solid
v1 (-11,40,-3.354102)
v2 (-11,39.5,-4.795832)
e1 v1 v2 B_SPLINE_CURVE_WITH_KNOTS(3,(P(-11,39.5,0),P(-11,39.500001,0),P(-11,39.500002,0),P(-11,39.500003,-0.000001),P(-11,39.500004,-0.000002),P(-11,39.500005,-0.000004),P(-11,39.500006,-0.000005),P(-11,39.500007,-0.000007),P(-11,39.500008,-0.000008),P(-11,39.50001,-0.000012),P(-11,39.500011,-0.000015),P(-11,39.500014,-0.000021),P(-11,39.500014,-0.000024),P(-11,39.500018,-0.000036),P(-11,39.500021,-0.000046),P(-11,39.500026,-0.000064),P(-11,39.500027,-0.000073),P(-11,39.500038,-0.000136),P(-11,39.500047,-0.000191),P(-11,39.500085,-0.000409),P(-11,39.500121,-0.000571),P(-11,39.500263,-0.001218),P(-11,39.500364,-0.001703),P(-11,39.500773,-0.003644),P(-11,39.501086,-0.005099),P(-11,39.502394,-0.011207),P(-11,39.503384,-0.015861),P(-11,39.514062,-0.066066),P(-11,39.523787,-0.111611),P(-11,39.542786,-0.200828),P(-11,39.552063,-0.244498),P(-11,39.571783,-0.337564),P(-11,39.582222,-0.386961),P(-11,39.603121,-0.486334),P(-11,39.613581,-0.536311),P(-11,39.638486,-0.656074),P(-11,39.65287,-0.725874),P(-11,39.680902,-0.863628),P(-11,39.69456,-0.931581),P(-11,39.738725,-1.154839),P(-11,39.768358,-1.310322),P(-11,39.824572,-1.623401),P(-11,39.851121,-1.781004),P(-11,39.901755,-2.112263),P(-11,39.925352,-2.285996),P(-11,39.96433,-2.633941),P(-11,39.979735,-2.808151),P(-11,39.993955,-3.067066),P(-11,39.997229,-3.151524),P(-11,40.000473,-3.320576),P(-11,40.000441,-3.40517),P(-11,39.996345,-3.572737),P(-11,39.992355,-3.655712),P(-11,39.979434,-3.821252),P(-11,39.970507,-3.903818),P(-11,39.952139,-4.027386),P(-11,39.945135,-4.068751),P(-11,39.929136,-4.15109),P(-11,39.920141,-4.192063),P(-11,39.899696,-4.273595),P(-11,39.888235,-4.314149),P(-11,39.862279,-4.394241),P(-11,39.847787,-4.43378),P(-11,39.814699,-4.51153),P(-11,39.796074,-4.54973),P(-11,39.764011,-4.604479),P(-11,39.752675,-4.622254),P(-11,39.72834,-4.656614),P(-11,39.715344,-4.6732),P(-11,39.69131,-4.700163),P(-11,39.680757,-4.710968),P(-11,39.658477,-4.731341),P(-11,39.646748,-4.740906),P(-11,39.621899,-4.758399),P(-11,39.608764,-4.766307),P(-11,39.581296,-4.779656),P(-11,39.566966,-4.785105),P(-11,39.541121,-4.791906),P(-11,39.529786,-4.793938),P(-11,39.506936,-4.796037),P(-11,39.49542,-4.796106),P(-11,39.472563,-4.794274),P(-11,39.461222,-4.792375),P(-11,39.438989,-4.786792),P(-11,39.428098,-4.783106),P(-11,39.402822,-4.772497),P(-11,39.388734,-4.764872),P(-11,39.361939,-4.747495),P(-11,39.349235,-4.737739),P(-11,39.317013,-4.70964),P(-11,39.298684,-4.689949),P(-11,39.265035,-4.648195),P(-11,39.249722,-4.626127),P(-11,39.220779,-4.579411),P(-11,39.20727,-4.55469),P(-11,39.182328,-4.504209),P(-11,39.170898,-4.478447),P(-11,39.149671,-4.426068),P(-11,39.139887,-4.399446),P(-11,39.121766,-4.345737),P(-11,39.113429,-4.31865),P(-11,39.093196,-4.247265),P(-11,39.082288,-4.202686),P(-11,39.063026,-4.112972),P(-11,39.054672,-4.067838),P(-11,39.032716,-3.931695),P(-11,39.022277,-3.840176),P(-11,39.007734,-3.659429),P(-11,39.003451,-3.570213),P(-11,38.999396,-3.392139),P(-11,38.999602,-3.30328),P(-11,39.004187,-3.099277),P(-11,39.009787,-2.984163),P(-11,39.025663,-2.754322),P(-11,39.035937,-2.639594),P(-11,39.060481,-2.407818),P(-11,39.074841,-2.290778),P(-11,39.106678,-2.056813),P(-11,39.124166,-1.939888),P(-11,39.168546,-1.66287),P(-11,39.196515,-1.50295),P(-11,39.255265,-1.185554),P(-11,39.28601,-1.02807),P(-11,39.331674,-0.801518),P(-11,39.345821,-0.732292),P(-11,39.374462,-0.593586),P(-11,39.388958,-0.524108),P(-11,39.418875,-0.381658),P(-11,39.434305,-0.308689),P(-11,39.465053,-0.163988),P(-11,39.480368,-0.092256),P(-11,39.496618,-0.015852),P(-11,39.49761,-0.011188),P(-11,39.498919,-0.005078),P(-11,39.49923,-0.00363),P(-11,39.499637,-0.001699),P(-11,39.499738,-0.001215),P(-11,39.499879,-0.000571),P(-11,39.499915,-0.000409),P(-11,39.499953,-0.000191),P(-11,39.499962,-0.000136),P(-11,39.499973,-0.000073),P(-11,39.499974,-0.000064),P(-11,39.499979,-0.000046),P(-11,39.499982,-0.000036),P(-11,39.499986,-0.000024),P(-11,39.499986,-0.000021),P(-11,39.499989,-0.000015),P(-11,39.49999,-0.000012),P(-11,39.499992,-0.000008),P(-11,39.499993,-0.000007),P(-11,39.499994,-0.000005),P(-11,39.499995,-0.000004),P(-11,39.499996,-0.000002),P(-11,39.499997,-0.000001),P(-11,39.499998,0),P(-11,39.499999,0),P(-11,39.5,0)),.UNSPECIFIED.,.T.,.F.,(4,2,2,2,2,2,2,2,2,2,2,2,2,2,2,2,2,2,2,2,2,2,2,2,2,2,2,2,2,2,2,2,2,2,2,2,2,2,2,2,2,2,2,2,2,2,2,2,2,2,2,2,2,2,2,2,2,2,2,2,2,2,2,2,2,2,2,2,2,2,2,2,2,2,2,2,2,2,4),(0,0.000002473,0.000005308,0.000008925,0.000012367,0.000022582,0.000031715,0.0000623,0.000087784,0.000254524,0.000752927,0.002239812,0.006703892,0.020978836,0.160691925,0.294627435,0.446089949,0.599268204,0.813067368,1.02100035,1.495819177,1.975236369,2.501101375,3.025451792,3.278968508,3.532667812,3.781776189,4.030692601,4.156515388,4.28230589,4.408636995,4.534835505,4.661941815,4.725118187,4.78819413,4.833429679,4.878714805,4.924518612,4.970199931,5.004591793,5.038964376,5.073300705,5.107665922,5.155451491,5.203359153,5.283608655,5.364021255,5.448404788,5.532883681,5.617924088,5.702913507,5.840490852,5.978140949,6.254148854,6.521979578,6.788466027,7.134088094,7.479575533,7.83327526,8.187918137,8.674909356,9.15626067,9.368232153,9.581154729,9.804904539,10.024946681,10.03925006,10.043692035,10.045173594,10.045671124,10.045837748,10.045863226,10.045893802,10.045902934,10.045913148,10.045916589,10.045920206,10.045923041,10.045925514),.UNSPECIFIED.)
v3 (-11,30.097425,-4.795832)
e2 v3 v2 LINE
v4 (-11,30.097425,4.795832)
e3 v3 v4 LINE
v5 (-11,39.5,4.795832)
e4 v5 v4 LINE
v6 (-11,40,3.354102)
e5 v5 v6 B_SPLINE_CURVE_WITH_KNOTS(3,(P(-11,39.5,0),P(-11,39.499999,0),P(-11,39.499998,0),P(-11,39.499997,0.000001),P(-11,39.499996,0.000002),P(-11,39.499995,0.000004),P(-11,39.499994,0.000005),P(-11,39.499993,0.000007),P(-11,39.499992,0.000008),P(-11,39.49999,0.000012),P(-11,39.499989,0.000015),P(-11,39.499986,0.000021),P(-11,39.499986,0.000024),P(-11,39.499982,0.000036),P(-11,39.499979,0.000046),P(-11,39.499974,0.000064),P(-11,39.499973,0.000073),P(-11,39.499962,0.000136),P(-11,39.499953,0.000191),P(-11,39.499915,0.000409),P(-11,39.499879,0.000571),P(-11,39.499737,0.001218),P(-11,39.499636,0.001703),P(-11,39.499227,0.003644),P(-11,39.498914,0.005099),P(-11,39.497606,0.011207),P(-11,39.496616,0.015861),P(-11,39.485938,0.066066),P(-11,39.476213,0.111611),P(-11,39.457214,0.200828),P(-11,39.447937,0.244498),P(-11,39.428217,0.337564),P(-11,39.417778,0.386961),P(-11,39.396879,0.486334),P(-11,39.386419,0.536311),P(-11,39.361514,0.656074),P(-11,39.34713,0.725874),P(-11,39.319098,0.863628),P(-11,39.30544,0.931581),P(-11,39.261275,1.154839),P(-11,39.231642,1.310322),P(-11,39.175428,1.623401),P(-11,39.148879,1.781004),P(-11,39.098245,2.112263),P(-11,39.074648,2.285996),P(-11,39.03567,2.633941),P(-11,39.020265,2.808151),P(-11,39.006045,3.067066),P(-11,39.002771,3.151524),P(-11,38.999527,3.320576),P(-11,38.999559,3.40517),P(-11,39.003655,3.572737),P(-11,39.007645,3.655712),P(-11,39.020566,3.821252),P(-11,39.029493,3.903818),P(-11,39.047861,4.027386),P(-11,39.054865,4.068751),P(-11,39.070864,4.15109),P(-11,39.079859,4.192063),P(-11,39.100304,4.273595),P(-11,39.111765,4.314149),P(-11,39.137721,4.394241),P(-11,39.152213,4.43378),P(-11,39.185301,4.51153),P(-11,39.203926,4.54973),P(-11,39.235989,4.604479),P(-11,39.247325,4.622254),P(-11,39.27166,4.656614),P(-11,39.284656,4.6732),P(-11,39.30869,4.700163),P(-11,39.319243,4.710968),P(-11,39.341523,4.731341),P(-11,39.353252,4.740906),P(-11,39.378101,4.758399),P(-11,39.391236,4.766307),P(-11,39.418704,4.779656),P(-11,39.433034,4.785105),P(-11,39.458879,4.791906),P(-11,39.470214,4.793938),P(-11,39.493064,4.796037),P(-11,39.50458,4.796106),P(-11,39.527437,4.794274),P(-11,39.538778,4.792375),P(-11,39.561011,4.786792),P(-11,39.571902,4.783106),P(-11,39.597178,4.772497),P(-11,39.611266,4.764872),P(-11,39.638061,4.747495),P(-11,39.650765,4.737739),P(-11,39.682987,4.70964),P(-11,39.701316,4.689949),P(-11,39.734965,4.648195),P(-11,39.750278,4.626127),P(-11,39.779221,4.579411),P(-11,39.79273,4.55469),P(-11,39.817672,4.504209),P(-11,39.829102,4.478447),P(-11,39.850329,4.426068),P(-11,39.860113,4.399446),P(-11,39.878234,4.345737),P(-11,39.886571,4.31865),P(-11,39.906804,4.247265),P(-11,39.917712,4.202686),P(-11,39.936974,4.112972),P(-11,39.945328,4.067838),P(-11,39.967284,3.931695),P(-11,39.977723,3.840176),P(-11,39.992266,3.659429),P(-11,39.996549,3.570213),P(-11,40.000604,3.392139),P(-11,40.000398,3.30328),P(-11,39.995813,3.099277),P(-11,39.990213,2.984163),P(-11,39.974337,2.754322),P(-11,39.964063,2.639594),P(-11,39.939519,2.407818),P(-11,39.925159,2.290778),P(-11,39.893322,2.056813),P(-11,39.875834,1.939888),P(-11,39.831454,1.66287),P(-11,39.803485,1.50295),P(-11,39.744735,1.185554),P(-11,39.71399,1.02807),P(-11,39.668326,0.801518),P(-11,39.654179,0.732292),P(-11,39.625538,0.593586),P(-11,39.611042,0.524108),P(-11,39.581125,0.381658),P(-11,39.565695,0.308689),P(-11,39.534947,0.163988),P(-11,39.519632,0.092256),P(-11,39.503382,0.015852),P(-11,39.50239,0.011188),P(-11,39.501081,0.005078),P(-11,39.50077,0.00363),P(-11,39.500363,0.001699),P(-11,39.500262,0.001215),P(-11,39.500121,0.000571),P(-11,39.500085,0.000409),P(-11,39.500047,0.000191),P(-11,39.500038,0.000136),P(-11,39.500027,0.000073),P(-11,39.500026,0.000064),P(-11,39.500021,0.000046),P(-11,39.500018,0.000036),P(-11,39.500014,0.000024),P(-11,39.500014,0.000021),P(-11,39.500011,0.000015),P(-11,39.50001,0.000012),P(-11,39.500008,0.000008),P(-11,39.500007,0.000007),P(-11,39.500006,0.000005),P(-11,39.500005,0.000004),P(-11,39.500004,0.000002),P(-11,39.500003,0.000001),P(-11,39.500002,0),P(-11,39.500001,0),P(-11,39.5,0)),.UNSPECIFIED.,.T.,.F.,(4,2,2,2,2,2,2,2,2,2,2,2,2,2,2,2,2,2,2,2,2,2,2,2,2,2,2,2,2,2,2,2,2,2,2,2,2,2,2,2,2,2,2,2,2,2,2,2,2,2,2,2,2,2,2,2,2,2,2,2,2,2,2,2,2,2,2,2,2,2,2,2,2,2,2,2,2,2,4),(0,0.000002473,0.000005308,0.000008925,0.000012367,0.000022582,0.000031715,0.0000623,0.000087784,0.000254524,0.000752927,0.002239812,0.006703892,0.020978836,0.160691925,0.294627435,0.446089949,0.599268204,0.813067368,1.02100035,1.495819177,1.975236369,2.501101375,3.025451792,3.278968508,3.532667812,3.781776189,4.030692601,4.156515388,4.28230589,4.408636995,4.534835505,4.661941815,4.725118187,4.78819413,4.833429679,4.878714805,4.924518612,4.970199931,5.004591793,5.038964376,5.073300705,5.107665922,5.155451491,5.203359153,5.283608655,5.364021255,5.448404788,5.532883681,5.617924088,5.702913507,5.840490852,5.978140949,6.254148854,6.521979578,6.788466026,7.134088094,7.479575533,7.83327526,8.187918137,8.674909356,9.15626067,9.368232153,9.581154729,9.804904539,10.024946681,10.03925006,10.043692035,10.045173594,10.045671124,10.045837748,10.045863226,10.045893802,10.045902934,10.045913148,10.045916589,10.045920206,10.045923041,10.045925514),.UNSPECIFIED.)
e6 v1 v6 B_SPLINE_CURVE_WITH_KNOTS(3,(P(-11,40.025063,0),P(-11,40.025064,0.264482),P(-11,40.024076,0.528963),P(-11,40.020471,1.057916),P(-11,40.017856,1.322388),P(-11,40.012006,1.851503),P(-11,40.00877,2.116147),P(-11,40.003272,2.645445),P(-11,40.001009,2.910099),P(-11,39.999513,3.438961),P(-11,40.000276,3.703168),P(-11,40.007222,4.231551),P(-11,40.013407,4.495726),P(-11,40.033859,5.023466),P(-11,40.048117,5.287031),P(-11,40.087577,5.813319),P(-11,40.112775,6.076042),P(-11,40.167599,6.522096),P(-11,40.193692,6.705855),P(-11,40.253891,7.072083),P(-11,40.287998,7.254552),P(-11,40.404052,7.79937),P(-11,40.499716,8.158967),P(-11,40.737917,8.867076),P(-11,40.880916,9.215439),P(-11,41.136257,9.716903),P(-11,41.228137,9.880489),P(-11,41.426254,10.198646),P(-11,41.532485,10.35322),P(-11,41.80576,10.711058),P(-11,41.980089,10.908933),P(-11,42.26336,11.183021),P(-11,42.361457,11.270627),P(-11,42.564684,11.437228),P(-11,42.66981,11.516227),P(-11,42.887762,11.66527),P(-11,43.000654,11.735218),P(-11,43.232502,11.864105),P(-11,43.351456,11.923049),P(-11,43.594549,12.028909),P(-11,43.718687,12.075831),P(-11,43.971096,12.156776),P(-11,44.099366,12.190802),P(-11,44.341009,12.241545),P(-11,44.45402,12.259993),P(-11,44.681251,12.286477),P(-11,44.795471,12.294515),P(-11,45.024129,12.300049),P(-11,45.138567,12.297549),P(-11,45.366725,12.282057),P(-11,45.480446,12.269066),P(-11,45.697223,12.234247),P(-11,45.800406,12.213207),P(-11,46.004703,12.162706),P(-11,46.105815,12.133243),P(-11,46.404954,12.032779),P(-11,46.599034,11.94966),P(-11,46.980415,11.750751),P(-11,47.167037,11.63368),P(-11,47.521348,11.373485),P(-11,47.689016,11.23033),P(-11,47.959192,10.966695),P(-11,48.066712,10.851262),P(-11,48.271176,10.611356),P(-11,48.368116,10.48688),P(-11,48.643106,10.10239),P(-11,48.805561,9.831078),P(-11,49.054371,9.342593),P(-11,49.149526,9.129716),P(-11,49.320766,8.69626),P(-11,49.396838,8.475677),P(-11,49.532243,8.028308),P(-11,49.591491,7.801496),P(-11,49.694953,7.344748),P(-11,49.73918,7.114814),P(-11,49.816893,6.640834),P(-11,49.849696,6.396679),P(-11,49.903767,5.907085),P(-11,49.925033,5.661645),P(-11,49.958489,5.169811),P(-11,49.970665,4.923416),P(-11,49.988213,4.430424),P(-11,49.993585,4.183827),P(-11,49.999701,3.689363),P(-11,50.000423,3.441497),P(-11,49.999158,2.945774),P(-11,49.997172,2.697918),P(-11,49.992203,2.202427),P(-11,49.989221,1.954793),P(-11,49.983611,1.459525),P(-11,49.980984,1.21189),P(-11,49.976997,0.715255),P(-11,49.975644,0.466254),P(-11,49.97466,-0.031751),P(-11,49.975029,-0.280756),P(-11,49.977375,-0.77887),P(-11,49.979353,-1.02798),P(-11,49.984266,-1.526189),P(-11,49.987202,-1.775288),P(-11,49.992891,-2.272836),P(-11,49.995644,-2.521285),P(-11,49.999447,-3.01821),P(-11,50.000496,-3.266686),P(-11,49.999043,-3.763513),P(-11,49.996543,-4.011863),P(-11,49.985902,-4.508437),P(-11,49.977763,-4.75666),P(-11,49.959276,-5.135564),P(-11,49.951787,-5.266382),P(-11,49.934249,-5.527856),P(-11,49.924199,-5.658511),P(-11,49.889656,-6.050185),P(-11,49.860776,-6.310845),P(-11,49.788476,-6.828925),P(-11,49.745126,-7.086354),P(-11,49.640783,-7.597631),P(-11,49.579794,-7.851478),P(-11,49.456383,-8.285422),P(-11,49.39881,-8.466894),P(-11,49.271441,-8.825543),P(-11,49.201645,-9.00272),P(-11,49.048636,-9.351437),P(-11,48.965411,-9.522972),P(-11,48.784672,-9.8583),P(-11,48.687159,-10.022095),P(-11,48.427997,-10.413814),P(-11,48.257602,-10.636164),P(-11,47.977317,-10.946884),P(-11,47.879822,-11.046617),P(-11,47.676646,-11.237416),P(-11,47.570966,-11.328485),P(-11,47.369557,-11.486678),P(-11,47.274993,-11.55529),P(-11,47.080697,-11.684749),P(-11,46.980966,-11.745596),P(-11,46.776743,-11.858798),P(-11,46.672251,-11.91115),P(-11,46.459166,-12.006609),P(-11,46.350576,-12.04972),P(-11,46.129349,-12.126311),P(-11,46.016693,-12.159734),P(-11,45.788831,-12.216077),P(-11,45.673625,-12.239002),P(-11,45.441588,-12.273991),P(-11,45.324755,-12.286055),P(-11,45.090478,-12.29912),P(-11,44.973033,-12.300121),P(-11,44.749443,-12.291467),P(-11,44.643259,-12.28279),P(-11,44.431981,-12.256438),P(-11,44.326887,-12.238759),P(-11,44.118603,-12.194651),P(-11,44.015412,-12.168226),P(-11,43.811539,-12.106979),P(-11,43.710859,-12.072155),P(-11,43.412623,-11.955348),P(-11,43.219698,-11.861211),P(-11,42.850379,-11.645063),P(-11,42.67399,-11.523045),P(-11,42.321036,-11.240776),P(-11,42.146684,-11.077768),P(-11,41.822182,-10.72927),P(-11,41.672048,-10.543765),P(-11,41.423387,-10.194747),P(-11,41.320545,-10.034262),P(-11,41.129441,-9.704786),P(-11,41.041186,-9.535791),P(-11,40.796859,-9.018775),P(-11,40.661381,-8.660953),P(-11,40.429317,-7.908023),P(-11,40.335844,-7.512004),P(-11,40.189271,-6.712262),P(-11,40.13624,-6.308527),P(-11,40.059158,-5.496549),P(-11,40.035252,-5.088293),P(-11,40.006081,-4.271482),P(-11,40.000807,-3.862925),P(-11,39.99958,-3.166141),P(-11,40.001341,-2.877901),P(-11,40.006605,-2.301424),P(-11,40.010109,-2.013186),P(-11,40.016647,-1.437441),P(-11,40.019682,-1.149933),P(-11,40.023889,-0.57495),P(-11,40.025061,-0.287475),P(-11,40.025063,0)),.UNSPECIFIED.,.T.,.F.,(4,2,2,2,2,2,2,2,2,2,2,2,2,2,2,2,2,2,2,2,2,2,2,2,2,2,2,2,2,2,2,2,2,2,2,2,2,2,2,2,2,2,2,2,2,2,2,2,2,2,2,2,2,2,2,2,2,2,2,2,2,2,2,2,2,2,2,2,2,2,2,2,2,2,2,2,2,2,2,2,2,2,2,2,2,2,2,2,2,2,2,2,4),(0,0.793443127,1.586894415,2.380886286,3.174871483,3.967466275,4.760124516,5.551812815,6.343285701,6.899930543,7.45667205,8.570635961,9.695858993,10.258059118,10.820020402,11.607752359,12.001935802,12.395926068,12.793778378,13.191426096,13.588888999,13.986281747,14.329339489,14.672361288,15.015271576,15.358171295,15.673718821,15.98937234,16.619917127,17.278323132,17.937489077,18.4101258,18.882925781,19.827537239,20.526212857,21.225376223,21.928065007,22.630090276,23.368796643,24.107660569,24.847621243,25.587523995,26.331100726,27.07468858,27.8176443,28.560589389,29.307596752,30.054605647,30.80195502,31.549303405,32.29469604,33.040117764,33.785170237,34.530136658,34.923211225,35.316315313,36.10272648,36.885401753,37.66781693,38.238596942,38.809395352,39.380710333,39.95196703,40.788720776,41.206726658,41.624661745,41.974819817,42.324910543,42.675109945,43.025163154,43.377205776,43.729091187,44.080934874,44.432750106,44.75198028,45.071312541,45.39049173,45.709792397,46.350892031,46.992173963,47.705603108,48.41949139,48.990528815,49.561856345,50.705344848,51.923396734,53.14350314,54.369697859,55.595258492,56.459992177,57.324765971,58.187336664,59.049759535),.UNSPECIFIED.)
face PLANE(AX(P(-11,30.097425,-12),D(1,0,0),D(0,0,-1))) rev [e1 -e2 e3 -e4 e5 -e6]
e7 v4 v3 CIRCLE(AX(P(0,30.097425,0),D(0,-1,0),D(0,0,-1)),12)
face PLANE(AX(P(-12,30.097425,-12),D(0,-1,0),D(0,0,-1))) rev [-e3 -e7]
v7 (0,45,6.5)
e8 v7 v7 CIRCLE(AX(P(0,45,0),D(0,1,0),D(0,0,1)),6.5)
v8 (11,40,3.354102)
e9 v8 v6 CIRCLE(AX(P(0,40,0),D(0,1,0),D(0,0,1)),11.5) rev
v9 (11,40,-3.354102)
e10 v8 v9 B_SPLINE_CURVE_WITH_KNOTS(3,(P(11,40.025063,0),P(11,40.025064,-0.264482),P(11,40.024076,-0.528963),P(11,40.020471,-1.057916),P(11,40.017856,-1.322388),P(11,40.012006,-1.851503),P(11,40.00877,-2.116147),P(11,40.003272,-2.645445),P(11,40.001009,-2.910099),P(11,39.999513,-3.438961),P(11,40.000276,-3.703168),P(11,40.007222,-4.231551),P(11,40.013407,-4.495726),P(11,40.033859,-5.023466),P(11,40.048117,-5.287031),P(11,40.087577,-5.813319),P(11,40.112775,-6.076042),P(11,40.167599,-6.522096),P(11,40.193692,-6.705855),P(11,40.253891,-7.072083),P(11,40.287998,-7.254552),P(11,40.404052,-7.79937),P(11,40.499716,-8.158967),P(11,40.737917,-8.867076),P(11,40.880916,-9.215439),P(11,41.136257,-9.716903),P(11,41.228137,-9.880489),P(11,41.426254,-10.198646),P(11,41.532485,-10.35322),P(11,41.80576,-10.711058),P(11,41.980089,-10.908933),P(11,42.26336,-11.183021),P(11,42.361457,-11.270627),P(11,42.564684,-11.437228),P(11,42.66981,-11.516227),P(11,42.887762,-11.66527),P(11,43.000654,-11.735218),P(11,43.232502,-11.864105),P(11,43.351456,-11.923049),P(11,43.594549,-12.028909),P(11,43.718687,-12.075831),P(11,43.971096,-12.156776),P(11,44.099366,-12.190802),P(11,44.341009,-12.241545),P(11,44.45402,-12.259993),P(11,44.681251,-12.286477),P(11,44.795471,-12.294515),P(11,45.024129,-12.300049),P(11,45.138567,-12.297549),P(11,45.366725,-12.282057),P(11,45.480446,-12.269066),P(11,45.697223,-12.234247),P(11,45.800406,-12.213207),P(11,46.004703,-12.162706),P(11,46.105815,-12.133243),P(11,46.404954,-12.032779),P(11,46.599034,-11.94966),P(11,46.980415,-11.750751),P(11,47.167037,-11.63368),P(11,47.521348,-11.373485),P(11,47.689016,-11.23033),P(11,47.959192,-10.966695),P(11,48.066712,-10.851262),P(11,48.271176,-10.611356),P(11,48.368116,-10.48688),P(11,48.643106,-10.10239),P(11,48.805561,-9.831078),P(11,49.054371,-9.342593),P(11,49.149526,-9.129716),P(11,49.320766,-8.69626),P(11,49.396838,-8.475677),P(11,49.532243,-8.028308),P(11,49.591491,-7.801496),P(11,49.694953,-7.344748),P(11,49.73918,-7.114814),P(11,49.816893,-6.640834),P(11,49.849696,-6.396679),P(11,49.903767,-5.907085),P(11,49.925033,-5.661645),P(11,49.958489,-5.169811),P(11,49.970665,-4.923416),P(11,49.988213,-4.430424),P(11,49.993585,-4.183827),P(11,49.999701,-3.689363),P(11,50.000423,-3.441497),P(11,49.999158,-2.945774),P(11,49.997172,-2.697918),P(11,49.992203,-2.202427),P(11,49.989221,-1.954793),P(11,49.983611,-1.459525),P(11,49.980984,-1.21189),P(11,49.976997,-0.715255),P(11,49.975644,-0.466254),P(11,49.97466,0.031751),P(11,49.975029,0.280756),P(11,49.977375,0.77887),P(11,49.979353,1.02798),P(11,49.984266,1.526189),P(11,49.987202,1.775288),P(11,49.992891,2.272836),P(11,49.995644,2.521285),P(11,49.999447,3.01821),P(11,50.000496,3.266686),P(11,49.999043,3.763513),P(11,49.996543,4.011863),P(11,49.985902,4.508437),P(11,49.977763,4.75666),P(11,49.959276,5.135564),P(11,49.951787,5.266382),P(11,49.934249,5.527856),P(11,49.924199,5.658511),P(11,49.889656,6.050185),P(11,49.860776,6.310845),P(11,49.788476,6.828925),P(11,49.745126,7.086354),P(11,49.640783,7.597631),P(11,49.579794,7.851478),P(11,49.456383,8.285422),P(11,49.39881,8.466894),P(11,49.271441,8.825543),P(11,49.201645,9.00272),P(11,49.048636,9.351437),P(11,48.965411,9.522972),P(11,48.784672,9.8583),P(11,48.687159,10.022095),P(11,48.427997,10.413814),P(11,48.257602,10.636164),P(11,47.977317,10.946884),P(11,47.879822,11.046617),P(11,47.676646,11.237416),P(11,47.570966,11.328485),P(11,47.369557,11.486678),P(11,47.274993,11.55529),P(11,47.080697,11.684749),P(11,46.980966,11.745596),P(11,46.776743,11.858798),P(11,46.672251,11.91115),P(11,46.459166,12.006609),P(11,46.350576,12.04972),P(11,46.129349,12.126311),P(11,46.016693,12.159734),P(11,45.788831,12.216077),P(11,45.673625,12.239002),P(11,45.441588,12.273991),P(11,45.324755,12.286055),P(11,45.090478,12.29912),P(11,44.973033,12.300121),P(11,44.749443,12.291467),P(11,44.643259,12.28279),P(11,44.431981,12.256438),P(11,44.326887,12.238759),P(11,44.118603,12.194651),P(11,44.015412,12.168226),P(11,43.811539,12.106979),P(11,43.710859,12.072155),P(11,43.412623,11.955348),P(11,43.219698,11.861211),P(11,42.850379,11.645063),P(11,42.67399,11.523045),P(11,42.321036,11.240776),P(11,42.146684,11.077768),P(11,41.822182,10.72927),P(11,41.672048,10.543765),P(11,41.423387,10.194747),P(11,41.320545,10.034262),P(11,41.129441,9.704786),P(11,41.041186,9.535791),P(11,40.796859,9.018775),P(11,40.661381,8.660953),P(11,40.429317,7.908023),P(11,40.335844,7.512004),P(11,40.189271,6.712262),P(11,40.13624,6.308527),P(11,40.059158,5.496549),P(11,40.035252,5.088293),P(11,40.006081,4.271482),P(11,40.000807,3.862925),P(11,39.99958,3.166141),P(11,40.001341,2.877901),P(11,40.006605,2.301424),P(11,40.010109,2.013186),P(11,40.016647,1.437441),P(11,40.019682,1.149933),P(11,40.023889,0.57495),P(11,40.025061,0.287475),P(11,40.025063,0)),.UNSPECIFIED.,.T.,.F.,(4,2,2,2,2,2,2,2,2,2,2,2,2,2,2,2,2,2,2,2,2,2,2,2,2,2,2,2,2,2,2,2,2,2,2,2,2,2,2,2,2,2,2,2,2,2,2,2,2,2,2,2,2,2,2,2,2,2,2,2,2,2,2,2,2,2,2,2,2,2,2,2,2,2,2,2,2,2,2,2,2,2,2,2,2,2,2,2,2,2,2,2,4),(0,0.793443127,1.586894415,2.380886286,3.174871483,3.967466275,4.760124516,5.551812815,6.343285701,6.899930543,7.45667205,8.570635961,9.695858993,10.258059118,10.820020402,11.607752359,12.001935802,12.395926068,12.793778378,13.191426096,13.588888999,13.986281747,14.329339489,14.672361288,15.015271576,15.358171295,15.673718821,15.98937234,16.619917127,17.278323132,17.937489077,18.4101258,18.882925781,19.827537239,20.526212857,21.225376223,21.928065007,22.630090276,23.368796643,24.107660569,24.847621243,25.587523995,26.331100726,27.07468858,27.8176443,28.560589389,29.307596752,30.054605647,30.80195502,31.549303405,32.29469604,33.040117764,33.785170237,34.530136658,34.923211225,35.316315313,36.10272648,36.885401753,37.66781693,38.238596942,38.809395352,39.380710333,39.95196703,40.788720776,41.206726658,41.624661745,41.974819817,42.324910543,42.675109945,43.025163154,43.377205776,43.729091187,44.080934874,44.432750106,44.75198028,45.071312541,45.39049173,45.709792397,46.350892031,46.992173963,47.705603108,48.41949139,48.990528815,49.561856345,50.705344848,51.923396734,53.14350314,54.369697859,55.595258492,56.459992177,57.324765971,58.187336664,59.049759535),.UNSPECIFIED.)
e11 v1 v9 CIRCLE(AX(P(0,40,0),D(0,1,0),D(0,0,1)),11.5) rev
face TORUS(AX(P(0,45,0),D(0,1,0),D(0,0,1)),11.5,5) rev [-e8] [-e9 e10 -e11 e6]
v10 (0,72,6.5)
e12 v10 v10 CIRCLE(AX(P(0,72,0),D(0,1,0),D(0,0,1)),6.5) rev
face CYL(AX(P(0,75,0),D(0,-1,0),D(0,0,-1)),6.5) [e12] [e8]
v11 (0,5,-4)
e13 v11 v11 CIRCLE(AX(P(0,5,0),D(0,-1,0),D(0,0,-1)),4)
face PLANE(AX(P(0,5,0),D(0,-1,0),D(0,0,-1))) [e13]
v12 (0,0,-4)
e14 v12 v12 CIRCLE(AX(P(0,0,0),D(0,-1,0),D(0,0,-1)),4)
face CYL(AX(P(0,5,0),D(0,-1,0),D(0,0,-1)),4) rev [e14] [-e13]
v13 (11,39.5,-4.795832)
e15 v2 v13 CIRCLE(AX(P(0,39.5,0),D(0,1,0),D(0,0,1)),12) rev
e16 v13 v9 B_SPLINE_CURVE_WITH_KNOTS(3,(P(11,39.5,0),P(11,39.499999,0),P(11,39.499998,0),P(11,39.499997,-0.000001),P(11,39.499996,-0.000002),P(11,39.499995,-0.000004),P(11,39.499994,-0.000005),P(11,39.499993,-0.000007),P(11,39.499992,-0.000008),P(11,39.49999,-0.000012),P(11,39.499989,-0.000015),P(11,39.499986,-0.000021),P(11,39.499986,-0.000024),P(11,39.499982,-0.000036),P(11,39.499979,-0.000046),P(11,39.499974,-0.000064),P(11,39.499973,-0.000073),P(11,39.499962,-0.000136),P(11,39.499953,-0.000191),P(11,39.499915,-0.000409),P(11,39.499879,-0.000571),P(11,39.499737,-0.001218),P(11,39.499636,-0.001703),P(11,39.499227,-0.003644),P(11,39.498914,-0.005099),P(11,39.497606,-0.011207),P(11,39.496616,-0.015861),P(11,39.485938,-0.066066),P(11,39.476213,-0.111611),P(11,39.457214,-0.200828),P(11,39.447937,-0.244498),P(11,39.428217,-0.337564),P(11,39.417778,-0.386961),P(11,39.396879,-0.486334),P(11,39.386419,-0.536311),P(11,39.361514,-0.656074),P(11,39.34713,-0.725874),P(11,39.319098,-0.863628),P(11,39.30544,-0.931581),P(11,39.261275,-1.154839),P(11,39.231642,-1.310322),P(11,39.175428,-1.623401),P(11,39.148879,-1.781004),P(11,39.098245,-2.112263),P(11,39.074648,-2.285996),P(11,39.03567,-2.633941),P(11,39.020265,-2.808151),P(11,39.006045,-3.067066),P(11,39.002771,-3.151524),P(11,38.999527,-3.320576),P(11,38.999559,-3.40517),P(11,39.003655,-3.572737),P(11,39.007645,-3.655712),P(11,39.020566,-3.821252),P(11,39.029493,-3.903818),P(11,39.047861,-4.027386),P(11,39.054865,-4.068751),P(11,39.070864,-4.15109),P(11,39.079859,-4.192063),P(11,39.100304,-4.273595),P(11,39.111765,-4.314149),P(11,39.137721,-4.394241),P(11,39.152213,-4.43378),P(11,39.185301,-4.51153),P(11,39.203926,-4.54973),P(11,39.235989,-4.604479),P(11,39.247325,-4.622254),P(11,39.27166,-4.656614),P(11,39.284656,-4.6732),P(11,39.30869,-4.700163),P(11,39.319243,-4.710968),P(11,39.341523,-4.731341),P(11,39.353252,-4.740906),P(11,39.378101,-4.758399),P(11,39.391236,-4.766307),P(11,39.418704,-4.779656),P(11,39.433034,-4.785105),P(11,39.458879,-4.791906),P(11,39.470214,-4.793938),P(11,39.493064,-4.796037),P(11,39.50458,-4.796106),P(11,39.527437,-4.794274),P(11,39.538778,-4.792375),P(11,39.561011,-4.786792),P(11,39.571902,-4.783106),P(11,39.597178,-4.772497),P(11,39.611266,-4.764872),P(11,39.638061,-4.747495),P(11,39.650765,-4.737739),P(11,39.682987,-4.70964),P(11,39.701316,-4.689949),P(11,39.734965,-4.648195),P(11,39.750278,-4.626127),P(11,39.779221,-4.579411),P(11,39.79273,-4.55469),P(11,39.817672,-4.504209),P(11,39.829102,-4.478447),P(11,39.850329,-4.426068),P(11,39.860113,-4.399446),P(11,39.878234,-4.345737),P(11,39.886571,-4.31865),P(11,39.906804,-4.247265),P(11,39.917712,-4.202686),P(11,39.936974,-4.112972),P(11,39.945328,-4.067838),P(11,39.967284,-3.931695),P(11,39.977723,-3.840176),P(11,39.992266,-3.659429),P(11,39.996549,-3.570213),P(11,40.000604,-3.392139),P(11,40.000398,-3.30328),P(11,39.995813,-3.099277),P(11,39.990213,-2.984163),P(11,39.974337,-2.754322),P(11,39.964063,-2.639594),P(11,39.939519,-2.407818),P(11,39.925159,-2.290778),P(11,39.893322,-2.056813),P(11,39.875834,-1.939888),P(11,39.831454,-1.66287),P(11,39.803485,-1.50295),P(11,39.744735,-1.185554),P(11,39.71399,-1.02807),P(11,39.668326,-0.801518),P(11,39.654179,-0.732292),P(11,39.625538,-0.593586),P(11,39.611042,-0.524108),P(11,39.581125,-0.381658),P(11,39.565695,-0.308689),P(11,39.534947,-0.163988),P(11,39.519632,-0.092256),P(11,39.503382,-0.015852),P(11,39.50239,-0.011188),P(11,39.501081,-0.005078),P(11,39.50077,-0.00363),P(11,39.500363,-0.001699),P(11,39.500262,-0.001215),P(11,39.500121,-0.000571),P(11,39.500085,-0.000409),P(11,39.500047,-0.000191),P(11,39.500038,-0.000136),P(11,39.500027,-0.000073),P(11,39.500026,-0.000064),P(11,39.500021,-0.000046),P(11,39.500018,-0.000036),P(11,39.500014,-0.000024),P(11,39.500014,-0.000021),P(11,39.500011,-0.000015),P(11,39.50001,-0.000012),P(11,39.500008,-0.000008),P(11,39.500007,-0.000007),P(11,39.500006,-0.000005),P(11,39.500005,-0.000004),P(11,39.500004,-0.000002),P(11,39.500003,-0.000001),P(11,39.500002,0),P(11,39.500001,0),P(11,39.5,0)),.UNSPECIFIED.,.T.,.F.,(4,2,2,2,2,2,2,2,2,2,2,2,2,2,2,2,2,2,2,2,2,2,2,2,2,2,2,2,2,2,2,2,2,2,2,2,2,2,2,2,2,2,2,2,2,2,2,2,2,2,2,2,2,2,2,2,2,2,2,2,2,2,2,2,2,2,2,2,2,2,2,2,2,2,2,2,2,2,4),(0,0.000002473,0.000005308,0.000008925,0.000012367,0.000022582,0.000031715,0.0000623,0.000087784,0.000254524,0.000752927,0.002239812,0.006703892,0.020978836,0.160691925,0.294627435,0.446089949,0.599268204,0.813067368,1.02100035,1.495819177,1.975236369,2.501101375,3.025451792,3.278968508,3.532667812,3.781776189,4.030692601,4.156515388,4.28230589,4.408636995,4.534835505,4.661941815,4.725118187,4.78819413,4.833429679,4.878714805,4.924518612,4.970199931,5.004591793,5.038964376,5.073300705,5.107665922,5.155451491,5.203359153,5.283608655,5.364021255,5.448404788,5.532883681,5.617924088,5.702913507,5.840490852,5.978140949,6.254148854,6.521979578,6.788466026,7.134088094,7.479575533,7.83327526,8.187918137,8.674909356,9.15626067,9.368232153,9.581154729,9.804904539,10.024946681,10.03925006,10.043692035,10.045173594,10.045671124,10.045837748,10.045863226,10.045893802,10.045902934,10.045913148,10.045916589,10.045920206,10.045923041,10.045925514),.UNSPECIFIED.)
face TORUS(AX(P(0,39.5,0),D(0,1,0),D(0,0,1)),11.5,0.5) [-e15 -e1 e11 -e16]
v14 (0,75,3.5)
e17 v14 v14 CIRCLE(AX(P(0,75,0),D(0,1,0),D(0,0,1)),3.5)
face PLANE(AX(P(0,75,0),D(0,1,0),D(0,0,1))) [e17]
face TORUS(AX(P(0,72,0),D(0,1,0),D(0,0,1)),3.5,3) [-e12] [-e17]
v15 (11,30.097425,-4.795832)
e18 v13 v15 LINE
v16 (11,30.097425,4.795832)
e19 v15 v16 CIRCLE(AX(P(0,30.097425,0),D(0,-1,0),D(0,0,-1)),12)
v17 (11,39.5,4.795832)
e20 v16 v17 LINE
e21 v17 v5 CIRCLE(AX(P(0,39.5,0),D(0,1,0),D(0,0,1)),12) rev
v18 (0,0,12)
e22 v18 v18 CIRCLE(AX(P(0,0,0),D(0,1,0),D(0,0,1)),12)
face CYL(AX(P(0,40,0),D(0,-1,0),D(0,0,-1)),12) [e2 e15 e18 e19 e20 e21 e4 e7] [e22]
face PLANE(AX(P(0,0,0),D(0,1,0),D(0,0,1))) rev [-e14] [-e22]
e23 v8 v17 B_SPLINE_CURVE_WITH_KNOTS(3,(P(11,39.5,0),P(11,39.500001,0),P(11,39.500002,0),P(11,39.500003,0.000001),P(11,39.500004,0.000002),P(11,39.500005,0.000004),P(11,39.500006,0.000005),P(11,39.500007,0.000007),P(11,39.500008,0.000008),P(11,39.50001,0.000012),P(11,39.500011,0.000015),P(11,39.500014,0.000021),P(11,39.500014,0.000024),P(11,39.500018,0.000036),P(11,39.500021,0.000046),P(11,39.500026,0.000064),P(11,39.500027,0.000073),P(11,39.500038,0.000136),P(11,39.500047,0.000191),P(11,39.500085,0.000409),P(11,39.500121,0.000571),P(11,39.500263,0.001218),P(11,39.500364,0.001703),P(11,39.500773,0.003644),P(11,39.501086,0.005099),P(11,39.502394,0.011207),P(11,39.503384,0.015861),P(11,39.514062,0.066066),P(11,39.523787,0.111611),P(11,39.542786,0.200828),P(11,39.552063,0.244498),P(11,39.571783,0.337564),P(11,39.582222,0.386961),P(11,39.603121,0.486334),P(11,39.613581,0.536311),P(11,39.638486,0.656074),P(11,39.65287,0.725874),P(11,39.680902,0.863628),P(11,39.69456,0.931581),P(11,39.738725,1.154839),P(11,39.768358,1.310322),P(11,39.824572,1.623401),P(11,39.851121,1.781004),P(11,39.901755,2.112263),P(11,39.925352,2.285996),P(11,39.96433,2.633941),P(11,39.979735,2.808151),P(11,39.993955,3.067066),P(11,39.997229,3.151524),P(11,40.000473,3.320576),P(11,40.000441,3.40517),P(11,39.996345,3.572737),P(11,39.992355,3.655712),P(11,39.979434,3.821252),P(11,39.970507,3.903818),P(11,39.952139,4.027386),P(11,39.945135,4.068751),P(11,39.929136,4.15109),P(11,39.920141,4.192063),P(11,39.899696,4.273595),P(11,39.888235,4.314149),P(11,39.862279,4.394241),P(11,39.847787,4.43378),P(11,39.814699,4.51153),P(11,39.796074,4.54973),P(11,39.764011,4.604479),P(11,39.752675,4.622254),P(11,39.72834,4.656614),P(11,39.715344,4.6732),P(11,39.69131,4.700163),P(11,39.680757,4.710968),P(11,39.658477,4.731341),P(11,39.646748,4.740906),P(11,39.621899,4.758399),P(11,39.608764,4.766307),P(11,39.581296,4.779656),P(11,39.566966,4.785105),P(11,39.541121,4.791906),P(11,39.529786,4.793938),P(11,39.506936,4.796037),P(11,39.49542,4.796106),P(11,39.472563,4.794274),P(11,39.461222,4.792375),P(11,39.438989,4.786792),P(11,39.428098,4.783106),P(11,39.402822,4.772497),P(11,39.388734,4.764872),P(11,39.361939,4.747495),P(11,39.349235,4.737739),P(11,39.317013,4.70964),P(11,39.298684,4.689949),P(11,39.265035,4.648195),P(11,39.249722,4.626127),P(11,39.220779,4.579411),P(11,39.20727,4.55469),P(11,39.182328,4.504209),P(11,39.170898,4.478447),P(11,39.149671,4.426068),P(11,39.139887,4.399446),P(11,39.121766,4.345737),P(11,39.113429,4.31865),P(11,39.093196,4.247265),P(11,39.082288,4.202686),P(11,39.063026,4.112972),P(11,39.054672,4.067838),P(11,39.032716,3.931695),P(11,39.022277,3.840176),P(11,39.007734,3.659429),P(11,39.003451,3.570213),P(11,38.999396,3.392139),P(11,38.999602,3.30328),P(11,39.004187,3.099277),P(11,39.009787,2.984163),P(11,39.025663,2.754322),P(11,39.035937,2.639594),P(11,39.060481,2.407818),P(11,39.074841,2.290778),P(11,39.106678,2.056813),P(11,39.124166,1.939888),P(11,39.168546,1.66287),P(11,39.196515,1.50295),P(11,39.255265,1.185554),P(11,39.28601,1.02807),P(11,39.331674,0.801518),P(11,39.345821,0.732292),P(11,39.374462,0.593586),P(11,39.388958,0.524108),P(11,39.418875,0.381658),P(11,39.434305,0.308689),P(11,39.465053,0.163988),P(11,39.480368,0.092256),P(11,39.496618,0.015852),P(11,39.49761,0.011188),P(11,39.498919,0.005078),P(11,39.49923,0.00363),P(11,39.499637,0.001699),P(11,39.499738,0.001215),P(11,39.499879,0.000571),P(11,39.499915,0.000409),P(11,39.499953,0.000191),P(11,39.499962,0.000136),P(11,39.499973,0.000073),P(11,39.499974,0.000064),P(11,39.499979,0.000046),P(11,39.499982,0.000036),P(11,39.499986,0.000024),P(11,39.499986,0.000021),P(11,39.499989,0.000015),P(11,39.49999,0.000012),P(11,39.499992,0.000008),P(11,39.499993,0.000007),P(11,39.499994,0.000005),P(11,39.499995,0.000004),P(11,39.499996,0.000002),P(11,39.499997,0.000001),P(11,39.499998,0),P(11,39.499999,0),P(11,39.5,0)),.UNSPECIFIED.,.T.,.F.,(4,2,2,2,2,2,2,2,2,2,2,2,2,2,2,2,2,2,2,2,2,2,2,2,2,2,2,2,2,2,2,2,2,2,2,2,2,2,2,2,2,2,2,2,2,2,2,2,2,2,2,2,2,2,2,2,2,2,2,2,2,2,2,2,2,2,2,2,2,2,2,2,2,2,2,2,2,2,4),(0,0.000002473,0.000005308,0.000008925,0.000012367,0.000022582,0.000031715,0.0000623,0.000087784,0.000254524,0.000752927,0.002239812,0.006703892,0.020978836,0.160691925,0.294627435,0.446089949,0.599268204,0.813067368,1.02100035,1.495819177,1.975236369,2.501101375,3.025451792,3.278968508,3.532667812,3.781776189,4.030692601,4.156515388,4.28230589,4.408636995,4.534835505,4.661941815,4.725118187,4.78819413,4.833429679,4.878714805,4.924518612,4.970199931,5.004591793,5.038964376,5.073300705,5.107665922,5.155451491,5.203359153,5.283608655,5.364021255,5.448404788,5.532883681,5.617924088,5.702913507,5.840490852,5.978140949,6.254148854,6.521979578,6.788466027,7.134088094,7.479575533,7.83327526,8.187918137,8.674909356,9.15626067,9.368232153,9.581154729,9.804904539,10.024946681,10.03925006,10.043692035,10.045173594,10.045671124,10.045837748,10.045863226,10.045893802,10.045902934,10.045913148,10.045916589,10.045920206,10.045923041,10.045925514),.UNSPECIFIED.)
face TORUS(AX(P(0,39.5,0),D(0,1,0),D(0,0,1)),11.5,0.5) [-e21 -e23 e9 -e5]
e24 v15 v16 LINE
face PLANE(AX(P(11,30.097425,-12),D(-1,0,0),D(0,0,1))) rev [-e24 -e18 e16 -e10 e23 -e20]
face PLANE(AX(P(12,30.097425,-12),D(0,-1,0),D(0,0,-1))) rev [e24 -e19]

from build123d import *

# Parameters (mm, degrees)
SKETCH1_R               = 12
BOSS_EXTRUDE1_DEPTH     = 40
SKETCH2_R               = 6.5
BOSS_EXTRUDE2_DEPTH     = 35
FILLET1_R               = 3
FILLET2_R               = 5
FILLET3_R               = 0.5
CUT_EXTRUDE1_DEPTH      = 77.896033821
CUT_EXTRUDE1_DEPTH_BACK = 77.896033821
SKETCH3_W               = 1
SKETCH3_H               = 10
SKETCH4_R               = 4
CUT_EXTRUDE2_DEPTH      = 5


with BuildPart() as part:
    # Sketch1 → Boss-Extrude1 (new body)
    with BuildSketch(Plane(origin=(0, 0, 0), x_dir=(1, 0, 0), z_dir=(0, 1, 0))):
        with Locations(Location((0, 0, 0), (0, 0, 270))):
            Circle(SKETCH1_R)
    extrude(amount=BOSS_EXTRUDE1_DEPTH)

    # Sketch2 → Boss-Extrude2 (add)
    with BuildSketch(Plane(origin=(0, 40, 0), x_dir=(1, 0, 0), z_dir=(0, 1, 0))):
        with Locations(Location((0, 0, 0), (0, 0, 270))):
            Circle(SKETCH2_R)
    extrude(amount=BOSS_EXTRUDE2_DEPTH)

    # Fillet1
    fillet1_edges = [part.edges().sort_by_distance(p)[0] for p in [
        (0, 75, -6.5),
    ]]
    fillet(fillet1_edges, radius=FILLET1_R)

    # Fillet2
    fillet2_edges = [part.edges().sort_by_distance(p)[0] for p in [
        (0, 40, -6.5),
    ]]
    fillet(fillet2_edges, radius=FILLET2_R)

    # Fillet3
    fillet3_edges = [part.edges().sort_by_distance(p)[0] for p in [
        (0, 40, -12),
    ]]
    fillet(fillet3_edges, radius=FILLET3_R - 0.0001)  # a hair under: the kernel refuses the full size

    # Sketch3 → Cut-Extrude1 (cut, two sides: drawn at the far end of the back side and taken through both)
    with BuildSketch(Plane.XY.offset(-CUT_EXTRUDE1_DEPTH_BACK)):
        with Locations((-11.5, 35.09742525)):
            Rectangle(SKETCH3_W, SKETCH3_H)
        with Locations((11.5, 35.09742525)):
            Rectangle(SKETCH3_W, SKETCH3_H)
    extrude(amount=CUT_EXTRUDE1_DEPTH + CUT_EXTRUDE1_DEPTH_BACK, mode=Mode.SUBTRACT)

    # Sketch4 → Cut-Extrude2 (cut)
    with BuildSketch(Plane.XZ):
        with Locations(Location((0, 0, 0), (0, 0, 270))):
            Circle(SKETCH4_R)
    extrude(amount=-CUT_EXTRUDE2_DEPTH, mode=Mode.SUBTRACT)


solid = part.part
